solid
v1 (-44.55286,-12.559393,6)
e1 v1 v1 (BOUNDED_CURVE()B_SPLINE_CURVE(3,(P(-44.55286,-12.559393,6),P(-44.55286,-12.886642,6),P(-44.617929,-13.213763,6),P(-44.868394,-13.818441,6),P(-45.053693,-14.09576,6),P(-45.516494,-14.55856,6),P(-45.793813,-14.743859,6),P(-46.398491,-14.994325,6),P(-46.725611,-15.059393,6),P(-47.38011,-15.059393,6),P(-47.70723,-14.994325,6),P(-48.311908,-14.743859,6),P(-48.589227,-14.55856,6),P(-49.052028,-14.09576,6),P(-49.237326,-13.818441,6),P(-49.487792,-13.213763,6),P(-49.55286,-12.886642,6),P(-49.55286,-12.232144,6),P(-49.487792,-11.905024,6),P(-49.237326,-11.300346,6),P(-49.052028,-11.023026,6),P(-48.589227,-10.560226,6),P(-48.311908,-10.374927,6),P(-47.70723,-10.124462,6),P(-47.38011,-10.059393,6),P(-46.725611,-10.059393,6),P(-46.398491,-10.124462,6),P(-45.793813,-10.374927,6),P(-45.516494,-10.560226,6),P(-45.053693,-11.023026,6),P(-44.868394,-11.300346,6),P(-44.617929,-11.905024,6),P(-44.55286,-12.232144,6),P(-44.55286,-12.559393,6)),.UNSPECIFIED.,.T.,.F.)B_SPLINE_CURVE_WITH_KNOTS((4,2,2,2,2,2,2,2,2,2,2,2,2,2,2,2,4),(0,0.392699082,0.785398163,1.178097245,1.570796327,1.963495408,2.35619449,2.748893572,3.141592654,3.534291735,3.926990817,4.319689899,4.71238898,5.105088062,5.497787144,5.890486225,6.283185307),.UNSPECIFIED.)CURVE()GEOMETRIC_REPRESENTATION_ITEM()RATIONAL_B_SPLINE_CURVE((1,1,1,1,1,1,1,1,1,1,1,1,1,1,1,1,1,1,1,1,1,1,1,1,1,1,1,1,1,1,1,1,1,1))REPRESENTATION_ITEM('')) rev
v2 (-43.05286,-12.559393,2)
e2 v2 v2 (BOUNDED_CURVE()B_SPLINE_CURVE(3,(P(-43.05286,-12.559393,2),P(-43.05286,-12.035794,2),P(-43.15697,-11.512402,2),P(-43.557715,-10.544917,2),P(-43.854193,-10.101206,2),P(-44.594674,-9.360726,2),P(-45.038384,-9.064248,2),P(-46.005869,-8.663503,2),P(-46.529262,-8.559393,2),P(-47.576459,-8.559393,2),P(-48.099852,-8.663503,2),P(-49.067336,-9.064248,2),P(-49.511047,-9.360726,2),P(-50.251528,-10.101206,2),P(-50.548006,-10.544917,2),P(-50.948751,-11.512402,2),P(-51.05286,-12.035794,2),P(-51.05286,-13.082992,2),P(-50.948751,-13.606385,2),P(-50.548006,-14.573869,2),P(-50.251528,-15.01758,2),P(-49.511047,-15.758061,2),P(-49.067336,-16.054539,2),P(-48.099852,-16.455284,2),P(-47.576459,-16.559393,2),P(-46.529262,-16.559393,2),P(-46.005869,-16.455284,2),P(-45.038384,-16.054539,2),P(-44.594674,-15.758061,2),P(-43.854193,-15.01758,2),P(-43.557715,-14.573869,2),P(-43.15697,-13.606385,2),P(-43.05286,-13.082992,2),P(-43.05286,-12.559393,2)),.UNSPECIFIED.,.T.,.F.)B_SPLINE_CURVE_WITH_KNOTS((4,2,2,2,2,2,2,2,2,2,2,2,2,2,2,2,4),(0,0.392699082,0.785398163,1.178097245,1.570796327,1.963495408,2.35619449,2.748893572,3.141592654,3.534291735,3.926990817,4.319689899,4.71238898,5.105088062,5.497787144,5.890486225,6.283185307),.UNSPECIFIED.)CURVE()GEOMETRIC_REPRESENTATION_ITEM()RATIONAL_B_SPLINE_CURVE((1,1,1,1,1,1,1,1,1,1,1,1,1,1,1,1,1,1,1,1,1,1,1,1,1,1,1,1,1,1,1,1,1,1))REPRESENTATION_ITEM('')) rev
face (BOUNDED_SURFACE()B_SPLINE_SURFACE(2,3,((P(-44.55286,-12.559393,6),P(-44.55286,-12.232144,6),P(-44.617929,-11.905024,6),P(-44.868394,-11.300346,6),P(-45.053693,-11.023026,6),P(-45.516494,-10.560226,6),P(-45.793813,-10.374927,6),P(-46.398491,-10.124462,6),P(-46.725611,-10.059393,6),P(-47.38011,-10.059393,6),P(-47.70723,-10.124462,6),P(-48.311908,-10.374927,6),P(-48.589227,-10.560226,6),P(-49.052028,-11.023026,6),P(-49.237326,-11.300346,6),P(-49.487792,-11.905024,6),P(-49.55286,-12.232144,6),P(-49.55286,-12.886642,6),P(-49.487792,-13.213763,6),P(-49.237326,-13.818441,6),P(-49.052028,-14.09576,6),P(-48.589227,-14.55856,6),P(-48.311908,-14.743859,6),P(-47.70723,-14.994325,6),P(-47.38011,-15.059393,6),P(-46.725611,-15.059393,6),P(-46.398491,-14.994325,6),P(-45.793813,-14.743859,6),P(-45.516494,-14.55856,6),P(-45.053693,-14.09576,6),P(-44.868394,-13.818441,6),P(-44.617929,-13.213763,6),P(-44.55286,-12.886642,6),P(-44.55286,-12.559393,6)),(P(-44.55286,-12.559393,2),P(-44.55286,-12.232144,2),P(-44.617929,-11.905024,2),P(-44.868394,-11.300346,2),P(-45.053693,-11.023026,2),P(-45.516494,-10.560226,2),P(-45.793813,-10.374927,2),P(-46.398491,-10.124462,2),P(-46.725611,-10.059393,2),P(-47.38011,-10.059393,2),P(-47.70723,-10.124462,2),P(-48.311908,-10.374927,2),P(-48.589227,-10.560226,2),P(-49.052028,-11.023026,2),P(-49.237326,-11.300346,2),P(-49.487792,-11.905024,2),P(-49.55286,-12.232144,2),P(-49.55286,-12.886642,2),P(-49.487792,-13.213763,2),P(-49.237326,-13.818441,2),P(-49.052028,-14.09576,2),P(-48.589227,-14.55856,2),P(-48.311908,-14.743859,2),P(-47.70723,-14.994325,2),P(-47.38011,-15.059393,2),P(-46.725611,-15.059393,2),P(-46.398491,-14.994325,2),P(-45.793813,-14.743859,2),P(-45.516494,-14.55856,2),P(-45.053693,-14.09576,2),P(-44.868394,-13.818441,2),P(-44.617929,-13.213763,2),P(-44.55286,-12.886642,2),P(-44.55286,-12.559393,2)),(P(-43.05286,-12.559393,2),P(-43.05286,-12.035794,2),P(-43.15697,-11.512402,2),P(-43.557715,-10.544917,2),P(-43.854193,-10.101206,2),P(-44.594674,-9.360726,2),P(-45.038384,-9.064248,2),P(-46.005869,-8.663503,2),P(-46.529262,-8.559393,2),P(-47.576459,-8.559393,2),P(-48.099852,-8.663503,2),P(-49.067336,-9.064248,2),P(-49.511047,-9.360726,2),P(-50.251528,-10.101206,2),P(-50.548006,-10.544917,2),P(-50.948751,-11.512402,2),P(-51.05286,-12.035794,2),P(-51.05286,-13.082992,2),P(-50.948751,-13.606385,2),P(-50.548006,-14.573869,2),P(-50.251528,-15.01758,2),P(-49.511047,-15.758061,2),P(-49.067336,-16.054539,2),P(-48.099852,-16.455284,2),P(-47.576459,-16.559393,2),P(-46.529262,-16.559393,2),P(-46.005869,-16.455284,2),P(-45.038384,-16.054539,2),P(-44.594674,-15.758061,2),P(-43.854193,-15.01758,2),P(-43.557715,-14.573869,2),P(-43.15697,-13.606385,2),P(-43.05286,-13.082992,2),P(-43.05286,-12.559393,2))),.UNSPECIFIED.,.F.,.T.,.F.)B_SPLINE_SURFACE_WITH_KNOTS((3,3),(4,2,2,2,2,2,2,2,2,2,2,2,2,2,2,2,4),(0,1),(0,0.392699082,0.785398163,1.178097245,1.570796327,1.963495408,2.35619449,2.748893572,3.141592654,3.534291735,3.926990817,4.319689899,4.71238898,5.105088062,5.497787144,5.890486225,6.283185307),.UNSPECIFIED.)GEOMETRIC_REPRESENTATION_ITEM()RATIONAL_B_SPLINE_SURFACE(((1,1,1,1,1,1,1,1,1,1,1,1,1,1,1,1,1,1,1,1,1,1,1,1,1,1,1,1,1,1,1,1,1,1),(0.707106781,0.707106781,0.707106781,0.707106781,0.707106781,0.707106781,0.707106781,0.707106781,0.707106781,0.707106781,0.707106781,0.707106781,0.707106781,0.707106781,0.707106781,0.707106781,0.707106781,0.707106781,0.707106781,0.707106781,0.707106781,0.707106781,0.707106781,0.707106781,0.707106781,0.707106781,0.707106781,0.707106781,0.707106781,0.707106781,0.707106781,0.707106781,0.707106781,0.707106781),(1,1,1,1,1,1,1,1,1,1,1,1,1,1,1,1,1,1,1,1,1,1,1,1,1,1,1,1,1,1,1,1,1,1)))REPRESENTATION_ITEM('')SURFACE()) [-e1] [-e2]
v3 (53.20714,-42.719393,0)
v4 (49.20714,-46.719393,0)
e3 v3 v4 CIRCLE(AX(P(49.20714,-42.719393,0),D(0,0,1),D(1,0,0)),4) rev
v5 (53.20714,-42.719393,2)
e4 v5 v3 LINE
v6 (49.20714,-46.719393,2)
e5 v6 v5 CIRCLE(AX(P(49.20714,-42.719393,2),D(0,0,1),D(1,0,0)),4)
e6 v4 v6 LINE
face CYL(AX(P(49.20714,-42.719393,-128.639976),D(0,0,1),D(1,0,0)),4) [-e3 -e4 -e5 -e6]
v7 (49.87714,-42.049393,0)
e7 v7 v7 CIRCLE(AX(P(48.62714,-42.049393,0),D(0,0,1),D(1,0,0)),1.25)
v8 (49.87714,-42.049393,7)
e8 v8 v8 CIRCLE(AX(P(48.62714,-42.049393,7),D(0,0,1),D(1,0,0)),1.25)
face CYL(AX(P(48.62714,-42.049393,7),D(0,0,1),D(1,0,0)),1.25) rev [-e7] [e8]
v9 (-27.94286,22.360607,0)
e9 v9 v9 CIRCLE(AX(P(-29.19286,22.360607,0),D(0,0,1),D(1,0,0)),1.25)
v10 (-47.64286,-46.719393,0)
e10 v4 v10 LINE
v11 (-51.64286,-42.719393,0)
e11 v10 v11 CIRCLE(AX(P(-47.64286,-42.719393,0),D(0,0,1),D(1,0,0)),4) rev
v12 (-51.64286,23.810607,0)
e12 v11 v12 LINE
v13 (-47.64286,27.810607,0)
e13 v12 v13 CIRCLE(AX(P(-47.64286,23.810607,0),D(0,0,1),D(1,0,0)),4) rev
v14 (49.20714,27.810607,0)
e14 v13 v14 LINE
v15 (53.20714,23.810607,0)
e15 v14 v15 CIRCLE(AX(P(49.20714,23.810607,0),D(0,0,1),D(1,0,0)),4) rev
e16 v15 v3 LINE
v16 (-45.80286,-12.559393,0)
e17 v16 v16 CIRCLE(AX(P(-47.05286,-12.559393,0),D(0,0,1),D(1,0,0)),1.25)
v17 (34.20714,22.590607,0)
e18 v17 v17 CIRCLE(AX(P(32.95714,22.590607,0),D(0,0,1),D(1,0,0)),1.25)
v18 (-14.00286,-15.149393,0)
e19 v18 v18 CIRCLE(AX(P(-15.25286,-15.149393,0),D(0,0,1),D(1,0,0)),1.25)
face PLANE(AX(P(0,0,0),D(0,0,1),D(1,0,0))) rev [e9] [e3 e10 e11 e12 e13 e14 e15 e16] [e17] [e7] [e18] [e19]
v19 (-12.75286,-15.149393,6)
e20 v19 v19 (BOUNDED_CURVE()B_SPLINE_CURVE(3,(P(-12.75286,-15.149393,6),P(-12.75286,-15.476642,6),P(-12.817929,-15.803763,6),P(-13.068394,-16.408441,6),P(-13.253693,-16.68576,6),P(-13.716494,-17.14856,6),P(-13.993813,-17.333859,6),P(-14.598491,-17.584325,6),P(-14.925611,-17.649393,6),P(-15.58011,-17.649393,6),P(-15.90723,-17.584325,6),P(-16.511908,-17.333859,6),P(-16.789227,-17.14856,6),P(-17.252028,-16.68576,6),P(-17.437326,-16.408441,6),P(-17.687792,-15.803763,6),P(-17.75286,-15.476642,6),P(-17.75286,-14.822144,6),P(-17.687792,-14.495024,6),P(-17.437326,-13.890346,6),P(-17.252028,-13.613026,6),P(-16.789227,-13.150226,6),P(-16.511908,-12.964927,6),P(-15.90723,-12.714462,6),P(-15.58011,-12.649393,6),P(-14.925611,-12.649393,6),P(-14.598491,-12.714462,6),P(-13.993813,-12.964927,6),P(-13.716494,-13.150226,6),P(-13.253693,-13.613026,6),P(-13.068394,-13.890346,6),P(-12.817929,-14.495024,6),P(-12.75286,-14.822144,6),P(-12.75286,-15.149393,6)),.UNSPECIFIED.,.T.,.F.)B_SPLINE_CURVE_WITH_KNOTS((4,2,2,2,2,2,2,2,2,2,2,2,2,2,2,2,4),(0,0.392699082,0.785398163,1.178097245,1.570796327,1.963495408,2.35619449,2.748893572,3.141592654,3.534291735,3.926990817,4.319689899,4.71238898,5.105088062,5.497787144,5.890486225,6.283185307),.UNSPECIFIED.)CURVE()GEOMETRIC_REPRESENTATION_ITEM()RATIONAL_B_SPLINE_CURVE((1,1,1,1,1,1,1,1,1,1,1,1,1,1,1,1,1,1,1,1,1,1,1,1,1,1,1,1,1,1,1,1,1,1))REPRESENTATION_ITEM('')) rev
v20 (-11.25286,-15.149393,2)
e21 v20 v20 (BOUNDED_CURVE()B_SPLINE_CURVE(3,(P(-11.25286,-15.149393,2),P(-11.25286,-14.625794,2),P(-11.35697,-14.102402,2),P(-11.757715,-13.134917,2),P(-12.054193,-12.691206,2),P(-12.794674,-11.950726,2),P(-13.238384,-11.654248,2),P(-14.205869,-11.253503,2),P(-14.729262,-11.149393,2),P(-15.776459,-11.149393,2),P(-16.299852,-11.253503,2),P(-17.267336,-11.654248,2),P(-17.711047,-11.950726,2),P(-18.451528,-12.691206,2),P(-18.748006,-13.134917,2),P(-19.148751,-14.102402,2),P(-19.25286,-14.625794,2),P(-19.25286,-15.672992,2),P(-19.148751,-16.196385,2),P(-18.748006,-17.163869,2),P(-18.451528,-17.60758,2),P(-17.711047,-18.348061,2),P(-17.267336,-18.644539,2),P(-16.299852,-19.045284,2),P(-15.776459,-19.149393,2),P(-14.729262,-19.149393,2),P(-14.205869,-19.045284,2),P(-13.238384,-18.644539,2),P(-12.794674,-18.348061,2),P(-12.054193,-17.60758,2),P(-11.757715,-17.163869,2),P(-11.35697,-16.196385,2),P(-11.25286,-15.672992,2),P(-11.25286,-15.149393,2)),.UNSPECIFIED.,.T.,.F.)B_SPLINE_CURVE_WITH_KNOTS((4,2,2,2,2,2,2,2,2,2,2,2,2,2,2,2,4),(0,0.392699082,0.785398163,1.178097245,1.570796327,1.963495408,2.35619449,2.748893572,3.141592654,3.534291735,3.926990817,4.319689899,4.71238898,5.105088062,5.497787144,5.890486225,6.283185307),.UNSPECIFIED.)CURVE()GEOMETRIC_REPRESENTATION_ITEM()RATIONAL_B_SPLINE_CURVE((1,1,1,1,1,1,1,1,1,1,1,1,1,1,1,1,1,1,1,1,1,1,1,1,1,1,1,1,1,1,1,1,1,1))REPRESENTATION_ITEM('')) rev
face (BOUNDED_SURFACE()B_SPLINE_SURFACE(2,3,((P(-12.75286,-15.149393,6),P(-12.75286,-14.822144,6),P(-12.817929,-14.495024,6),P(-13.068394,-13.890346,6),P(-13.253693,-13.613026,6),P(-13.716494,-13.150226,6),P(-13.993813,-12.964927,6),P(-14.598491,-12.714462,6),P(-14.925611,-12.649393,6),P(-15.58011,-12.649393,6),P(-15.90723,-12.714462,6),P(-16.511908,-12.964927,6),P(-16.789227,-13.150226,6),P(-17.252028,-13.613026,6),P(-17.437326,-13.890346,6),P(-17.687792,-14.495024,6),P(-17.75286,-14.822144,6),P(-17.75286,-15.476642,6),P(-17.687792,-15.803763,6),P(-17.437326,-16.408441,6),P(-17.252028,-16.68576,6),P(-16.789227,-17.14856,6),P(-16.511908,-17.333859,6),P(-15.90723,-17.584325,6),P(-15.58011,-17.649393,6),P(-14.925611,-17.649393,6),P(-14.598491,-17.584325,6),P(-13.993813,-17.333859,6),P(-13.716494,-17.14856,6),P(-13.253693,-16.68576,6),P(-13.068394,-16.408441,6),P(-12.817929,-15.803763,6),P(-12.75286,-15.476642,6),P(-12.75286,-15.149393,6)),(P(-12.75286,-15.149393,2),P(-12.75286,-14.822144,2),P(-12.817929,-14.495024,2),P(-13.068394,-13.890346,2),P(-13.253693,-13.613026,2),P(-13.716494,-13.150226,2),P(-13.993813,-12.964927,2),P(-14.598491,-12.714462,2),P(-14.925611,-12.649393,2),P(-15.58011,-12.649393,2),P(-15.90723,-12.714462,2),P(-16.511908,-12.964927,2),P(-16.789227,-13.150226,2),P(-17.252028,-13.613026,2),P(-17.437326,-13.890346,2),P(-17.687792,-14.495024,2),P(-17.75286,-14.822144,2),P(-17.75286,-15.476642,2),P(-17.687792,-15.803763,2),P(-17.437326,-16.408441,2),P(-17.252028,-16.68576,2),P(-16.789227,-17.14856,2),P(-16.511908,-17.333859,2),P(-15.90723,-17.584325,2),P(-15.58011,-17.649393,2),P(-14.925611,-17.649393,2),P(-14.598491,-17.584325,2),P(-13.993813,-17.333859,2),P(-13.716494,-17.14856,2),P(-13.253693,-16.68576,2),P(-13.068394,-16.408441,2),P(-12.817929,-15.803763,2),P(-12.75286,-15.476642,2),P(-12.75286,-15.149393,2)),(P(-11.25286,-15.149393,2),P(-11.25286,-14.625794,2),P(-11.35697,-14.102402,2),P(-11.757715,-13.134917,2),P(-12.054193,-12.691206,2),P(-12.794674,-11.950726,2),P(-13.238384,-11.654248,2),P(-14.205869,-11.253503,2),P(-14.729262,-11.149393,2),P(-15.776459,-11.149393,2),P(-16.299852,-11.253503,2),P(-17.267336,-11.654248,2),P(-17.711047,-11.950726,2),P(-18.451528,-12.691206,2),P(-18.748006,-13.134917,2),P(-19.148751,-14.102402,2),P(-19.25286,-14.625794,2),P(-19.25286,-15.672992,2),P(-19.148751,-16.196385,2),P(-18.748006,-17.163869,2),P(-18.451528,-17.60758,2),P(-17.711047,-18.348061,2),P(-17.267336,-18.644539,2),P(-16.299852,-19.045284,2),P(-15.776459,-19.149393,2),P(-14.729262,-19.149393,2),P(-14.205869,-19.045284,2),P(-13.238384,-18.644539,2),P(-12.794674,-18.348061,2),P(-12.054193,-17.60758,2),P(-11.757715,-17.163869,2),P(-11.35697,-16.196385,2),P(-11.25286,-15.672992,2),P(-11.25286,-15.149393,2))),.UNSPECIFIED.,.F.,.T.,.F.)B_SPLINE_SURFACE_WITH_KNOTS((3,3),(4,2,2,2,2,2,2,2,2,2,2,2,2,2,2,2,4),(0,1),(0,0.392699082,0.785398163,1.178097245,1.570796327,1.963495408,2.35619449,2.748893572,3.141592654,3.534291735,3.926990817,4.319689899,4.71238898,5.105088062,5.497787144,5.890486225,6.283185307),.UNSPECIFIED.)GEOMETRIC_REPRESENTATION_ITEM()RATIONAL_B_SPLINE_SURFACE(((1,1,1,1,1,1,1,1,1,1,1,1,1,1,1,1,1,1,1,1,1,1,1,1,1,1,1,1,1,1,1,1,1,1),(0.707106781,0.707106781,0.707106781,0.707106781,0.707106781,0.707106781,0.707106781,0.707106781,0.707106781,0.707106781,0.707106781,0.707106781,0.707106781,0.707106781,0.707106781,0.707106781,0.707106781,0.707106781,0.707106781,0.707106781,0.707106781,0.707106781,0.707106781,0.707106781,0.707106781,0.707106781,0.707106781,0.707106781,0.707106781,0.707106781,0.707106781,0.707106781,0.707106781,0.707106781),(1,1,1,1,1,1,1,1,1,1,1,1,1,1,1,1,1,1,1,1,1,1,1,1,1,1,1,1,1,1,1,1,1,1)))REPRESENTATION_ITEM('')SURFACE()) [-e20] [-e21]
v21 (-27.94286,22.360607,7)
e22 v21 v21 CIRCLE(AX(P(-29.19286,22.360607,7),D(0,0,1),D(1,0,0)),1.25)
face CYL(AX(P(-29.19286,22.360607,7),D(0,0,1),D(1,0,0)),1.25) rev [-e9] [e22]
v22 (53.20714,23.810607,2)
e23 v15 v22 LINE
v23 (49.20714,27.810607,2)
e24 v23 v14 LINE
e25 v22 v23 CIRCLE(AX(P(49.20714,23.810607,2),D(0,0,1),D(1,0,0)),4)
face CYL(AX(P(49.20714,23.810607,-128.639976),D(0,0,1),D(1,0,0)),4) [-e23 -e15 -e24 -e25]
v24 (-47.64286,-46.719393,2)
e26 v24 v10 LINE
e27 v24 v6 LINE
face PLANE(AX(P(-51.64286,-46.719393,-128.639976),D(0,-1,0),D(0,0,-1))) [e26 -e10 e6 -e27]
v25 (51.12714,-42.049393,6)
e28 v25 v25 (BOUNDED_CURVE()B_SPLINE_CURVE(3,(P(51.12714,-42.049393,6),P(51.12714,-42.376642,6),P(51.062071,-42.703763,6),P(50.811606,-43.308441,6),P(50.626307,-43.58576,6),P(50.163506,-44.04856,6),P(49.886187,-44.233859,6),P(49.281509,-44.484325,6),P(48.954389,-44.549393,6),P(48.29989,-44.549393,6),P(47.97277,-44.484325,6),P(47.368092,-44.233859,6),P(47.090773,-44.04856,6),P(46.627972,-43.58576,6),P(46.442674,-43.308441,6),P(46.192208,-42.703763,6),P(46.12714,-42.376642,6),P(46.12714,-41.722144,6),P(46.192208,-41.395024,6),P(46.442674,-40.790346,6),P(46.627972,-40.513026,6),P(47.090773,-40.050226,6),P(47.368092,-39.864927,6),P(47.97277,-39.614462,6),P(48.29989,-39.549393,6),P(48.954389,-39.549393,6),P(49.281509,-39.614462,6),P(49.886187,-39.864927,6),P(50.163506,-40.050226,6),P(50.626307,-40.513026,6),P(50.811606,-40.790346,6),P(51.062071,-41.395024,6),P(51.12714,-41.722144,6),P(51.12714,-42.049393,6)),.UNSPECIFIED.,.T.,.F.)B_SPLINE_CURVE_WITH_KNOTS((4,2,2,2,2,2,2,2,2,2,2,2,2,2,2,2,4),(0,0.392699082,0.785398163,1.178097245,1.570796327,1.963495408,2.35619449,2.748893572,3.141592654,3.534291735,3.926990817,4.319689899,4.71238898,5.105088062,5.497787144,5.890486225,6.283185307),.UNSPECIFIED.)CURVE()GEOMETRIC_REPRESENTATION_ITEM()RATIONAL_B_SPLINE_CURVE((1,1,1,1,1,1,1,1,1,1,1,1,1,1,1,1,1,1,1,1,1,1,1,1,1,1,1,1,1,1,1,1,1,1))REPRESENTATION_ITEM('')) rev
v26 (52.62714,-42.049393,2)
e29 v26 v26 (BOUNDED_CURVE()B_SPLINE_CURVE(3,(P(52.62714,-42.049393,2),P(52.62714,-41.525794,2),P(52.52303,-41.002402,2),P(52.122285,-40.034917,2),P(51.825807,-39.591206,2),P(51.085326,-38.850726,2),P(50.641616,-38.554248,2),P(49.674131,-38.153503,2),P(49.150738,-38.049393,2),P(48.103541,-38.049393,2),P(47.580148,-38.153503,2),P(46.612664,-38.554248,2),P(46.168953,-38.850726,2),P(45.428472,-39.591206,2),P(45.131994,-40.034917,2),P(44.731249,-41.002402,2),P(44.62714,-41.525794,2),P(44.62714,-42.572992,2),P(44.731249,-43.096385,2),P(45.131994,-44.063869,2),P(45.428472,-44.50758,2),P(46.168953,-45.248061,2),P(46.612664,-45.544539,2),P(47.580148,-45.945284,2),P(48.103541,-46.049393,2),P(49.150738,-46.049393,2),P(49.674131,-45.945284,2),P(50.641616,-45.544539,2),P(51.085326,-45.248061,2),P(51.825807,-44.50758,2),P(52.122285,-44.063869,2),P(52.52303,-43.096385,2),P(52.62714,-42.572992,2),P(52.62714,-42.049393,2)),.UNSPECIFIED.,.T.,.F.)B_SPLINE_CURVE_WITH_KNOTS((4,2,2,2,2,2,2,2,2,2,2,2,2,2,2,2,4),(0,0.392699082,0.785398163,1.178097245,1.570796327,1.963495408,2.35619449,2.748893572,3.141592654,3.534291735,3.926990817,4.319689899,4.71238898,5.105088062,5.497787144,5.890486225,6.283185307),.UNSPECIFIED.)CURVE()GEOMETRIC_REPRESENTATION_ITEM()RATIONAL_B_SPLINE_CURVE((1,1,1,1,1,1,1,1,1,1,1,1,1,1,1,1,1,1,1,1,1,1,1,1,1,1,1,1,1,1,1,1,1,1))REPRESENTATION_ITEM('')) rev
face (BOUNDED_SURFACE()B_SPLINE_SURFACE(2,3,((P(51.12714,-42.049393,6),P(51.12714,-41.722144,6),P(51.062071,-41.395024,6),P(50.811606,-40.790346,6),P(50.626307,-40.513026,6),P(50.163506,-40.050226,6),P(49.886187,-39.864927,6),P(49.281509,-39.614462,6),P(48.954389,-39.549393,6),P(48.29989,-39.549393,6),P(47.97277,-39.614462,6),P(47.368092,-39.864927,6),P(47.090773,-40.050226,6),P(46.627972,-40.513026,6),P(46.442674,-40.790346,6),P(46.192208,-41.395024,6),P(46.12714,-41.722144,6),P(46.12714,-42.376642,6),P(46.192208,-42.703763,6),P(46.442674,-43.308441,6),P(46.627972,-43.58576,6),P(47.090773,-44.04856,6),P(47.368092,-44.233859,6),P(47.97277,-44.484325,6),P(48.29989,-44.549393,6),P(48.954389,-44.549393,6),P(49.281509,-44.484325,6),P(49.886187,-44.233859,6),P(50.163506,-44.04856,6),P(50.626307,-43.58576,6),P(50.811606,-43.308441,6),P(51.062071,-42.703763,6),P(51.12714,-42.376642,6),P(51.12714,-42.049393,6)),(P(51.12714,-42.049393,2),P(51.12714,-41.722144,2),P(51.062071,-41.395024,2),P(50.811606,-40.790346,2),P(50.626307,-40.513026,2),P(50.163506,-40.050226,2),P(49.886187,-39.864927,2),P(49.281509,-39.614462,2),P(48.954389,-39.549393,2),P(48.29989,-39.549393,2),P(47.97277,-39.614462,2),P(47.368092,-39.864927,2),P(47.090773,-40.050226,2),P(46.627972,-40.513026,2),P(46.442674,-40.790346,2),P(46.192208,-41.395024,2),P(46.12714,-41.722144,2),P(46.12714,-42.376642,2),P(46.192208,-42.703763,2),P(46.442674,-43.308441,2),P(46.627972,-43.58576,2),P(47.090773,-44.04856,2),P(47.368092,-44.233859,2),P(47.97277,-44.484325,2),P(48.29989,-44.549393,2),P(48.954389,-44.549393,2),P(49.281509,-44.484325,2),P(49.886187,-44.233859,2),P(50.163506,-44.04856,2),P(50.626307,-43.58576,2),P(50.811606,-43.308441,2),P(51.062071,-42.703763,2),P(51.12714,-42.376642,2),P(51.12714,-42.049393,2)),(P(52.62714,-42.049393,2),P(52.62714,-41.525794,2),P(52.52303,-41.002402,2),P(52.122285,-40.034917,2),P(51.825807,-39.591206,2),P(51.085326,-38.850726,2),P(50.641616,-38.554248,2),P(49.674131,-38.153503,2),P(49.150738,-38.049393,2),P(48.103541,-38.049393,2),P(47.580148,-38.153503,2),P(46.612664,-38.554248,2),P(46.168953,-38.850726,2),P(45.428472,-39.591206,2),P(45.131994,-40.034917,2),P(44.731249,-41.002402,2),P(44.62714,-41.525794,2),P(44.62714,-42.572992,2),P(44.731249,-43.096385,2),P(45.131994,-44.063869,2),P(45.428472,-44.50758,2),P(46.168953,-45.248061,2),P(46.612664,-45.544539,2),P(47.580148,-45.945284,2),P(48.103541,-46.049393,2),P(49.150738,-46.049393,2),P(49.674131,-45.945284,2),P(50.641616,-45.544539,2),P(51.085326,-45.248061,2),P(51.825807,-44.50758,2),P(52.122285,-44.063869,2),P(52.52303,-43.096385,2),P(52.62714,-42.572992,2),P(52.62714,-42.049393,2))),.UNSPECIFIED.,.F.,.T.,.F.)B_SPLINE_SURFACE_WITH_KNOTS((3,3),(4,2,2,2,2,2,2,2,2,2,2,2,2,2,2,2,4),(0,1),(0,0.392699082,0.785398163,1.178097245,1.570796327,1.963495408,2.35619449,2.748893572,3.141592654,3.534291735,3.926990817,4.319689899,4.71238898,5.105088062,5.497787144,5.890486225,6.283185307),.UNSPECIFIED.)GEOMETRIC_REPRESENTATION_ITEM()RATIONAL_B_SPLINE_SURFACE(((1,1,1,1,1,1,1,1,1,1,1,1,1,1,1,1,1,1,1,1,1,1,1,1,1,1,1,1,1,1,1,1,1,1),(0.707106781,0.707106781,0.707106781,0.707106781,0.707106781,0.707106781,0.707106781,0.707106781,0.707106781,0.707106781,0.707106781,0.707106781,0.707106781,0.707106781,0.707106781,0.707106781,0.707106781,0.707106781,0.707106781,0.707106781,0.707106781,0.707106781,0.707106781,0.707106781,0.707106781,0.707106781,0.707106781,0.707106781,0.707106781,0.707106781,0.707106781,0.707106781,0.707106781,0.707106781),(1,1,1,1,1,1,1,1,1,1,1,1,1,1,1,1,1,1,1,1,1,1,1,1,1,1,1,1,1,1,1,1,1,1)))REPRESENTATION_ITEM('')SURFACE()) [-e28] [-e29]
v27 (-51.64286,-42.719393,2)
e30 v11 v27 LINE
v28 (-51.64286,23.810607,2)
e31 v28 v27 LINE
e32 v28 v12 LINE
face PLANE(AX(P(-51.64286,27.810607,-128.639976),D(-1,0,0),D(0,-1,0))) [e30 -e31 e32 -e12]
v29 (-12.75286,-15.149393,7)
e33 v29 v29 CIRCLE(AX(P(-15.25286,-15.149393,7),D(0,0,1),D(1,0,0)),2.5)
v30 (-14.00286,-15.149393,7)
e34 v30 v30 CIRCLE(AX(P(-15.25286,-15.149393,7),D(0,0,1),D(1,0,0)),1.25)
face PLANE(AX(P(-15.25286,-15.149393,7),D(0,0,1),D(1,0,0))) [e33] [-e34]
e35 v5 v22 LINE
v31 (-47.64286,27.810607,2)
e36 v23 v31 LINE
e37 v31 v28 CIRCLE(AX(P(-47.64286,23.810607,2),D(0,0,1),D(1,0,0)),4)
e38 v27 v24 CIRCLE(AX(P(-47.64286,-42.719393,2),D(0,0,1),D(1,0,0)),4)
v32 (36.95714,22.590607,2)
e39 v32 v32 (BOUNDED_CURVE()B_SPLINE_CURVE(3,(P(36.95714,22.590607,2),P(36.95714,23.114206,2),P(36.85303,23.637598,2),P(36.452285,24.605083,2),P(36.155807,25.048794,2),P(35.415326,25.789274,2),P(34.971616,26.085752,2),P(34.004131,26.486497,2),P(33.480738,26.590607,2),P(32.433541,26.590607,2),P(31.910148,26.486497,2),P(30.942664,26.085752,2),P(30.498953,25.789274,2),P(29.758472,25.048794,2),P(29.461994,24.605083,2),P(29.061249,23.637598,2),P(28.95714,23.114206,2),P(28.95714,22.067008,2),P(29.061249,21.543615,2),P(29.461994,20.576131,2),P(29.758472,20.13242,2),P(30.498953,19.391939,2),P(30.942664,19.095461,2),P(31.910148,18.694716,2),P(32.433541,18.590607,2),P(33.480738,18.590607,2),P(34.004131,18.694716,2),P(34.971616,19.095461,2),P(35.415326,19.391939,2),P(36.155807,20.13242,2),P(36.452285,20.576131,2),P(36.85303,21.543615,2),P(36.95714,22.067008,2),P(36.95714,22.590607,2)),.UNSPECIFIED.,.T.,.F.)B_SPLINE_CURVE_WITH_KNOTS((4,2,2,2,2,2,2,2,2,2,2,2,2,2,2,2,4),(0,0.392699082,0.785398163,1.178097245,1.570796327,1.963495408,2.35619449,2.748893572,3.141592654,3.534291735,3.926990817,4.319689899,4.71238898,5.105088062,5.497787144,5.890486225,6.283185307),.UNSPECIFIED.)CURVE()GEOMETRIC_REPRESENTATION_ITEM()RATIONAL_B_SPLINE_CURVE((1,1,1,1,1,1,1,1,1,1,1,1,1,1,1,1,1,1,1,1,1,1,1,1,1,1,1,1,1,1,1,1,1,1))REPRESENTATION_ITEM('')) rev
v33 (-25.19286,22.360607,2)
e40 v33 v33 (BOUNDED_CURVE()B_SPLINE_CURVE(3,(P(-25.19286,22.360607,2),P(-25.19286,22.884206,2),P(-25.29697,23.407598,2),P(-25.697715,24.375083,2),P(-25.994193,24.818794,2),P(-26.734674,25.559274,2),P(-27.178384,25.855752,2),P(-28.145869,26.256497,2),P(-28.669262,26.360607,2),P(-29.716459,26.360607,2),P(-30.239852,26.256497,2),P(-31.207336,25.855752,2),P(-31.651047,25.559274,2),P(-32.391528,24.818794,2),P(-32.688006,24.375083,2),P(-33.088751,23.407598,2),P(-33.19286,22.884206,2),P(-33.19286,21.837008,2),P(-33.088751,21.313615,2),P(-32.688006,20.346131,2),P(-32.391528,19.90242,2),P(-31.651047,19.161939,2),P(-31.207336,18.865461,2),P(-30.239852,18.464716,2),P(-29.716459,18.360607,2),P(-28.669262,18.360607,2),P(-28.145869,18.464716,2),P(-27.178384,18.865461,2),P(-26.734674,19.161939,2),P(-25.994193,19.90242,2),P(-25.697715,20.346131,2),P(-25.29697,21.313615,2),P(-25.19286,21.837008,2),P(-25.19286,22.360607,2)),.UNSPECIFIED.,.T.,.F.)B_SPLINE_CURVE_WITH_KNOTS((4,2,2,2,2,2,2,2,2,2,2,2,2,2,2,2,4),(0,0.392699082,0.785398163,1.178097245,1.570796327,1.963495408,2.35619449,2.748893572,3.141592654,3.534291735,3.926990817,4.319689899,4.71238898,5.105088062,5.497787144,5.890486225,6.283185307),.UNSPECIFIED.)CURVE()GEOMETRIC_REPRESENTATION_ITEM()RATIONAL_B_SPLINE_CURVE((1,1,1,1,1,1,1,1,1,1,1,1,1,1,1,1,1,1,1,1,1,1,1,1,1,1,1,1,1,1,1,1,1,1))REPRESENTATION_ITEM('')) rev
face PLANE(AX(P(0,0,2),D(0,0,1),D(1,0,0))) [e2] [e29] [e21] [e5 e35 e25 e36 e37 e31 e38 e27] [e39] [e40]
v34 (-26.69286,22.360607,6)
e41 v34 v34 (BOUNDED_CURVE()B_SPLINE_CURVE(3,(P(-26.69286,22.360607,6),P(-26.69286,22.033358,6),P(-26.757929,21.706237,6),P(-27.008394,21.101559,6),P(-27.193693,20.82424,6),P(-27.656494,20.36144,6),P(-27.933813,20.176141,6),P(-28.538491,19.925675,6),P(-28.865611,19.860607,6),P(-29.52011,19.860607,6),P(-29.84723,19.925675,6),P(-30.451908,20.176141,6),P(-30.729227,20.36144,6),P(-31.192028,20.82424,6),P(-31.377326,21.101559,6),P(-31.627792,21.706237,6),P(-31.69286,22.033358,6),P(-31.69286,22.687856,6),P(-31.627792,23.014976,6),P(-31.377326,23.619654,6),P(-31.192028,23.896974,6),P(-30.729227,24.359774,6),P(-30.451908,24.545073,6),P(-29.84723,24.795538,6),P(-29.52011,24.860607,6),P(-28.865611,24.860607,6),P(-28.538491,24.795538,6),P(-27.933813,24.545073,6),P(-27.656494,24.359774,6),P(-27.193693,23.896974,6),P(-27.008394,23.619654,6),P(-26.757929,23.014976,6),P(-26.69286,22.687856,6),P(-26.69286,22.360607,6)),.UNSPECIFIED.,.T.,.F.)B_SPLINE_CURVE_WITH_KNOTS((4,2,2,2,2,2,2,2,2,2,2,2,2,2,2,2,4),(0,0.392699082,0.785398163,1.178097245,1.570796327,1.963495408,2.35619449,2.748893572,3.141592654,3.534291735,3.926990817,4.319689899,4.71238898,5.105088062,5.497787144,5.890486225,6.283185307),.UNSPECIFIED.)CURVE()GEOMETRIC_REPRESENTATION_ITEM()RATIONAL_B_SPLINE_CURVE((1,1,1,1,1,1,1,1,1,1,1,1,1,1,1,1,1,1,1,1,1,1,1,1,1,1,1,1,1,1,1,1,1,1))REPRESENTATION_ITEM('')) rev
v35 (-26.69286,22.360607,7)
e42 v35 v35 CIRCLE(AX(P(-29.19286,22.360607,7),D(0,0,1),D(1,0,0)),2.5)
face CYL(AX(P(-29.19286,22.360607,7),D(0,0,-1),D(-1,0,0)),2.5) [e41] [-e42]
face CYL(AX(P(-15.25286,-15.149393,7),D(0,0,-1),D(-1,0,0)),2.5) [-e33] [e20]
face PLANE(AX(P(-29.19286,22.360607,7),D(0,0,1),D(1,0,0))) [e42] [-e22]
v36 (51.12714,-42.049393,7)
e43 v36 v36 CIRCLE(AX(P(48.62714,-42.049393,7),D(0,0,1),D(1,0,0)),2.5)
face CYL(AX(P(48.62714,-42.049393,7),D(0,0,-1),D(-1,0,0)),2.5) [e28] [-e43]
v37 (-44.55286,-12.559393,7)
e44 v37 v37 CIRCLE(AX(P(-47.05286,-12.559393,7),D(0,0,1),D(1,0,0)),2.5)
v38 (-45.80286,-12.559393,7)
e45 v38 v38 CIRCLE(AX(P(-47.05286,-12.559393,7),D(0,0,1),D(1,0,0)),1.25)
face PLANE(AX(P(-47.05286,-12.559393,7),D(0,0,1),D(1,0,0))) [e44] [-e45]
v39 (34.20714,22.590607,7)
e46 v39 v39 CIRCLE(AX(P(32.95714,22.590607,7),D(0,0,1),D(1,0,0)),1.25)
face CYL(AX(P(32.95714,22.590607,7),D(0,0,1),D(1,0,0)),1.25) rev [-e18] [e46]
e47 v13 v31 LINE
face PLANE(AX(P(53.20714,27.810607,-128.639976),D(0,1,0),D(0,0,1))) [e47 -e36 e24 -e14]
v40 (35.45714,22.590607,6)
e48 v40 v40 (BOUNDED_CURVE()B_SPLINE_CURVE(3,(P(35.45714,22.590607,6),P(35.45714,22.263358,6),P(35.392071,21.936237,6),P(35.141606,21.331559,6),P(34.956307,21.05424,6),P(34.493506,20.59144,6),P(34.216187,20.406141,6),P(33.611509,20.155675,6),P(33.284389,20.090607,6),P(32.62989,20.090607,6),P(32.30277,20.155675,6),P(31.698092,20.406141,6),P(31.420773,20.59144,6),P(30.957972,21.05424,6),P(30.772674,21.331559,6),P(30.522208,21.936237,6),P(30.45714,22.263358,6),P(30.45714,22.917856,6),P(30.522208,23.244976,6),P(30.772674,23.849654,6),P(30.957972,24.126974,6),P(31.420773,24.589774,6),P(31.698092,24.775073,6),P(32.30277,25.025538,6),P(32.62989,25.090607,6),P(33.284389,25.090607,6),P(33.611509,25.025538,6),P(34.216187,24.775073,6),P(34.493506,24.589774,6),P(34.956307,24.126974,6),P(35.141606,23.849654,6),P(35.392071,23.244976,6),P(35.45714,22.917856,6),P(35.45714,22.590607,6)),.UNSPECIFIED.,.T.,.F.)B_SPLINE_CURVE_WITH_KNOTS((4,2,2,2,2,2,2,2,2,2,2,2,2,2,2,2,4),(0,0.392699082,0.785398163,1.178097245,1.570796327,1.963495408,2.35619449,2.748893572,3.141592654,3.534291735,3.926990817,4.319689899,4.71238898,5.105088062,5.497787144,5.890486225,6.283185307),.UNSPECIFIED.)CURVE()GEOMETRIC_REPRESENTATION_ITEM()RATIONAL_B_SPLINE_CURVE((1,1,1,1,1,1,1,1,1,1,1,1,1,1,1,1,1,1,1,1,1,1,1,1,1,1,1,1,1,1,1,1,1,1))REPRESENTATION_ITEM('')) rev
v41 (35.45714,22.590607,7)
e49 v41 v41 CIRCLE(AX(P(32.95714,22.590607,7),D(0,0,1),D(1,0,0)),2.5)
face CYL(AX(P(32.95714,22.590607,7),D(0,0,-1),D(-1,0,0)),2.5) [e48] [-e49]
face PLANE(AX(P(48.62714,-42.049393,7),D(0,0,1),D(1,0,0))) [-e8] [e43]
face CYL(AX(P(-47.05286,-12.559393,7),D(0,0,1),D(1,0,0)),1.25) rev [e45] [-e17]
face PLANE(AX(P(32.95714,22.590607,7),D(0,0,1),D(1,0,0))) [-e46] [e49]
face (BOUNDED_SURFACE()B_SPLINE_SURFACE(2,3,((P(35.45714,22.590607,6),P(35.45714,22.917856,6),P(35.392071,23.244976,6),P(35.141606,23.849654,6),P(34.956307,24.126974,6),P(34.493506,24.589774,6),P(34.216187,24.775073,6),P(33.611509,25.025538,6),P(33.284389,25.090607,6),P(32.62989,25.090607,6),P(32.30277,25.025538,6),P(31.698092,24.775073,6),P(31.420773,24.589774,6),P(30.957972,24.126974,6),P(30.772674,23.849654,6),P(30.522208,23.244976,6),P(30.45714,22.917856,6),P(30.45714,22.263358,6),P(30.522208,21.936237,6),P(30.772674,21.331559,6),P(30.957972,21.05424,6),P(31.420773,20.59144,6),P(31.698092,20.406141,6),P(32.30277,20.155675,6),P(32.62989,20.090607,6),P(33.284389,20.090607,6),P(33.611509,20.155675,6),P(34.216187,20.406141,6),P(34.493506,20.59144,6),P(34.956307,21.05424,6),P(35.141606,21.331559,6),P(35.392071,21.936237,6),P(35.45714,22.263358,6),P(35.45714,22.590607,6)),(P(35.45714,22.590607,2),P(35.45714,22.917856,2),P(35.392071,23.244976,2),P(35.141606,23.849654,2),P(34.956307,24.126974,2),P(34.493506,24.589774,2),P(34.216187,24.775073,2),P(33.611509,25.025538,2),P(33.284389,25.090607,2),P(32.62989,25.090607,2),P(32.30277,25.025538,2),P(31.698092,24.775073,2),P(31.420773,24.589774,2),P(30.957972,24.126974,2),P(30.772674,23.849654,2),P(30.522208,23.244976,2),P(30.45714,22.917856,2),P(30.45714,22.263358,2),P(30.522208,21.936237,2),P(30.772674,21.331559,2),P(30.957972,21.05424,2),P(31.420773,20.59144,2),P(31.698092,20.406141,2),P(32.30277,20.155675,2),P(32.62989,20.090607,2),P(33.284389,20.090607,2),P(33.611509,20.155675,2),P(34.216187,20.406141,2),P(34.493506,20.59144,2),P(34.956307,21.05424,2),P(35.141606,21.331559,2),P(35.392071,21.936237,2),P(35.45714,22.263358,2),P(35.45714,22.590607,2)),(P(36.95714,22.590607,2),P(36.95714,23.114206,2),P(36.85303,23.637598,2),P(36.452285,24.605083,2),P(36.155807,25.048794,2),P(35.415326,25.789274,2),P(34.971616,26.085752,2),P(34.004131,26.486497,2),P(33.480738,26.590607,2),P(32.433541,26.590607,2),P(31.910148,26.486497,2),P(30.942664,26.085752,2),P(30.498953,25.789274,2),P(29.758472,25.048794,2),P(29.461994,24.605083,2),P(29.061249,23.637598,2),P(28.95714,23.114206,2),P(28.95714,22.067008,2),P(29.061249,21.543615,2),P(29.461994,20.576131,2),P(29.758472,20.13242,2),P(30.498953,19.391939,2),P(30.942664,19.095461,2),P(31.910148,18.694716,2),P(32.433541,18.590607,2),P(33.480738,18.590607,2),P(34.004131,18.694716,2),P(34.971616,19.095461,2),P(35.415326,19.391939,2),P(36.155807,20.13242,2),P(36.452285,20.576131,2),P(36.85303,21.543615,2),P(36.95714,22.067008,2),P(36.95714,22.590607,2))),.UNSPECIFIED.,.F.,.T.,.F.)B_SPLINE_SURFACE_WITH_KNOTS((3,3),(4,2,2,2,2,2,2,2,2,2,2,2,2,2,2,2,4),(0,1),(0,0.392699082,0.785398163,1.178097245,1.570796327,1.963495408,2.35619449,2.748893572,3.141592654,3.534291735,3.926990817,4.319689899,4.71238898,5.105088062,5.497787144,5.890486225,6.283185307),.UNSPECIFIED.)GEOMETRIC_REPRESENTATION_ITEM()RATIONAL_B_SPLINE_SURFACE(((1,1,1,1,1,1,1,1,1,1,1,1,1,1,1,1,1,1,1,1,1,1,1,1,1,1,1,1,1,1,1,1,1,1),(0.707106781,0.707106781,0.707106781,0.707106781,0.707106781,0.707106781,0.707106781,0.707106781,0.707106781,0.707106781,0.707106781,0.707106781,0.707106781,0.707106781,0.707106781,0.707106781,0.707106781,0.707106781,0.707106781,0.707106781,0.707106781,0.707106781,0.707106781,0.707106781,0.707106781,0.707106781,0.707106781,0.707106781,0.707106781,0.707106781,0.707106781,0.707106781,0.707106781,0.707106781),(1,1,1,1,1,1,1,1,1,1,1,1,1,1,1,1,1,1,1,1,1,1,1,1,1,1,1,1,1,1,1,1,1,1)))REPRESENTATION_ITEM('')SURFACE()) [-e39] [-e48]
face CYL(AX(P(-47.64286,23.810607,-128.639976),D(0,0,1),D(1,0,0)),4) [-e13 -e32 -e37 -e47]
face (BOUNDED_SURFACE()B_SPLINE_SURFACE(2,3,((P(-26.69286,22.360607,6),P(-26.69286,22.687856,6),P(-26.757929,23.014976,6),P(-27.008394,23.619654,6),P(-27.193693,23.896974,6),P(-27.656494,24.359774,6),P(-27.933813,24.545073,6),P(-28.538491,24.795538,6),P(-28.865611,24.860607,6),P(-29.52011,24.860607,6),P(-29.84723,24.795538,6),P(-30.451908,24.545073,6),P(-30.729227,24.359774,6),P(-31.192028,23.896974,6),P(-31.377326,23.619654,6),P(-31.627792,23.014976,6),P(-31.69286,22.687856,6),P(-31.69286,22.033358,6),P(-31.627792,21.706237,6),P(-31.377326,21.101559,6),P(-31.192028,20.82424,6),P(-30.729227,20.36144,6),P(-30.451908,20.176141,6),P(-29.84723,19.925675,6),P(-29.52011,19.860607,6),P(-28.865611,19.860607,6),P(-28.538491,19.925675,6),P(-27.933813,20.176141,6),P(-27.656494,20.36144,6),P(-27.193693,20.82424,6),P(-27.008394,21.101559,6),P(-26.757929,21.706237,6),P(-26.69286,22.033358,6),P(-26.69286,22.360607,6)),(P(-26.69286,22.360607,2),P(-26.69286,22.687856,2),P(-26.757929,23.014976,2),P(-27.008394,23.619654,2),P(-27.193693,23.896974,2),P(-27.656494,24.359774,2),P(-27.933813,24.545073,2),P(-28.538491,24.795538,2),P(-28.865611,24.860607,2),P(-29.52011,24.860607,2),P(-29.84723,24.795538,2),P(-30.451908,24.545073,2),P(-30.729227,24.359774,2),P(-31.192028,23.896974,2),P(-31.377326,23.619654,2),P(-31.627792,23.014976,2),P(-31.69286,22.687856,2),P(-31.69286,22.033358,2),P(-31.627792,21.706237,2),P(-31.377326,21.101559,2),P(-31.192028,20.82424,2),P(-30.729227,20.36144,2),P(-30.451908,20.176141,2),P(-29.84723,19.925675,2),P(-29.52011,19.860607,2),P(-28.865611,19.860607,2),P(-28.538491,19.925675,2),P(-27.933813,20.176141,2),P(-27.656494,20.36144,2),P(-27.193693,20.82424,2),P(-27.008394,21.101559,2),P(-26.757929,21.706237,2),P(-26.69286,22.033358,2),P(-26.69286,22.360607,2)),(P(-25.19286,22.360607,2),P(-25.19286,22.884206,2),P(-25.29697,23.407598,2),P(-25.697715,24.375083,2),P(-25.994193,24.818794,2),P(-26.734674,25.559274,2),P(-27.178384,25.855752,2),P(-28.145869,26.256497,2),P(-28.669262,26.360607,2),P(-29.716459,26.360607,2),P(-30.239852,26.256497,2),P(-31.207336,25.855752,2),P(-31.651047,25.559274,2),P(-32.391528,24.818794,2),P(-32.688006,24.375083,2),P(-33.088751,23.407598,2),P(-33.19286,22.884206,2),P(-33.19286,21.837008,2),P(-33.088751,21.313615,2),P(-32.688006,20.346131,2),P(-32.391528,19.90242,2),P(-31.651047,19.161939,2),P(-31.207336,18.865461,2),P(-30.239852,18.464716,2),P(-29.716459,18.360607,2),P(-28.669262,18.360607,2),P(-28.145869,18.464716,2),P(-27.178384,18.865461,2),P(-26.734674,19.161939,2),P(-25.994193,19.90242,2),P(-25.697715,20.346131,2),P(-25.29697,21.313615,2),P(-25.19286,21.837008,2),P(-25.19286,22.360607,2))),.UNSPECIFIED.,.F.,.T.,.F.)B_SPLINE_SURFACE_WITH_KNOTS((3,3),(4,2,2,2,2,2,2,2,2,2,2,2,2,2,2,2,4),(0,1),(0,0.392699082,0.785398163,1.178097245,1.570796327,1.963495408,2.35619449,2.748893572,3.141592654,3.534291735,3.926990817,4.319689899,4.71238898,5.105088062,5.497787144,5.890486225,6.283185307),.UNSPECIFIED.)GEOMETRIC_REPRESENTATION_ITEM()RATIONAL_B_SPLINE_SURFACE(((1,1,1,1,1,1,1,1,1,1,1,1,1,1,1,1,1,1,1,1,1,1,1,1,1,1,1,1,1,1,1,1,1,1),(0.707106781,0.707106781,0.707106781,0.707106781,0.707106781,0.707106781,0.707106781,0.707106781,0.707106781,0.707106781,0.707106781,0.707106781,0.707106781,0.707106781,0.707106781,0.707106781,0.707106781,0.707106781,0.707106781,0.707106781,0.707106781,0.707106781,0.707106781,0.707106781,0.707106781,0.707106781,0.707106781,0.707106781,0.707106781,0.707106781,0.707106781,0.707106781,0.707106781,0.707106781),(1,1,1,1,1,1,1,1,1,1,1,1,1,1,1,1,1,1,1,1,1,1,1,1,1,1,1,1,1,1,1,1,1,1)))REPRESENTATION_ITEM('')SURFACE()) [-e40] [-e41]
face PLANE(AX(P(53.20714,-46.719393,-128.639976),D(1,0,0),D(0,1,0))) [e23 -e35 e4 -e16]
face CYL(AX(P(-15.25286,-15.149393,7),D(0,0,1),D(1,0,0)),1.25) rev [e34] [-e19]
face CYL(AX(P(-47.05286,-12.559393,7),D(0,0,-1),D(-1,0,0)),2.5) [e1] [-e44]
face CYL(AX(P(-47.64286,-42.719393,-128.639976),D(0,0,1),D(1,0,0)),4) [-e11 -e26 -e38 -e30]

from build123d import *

# Parameters (mm, degrees)
SKETCH1_W           = 100.85
SKETCH1_H           = 70.53
BOSS_EXTRUDE1_DEPTH = 2
SKETCH6_W           = 104.85
SKETCH6_H           = 74.53
BOSS_EXTRUDE3_DEPTH = 2
SKETCH3_R           = 2.5
BOSS_EXTRUDE2_DEPTH = 5
FILLET1_SIZE        = 1.5
FILLET1_SIZE_2      = 4
FILLET2_R           = 4


with BuildPart() as part:
    # Sketch1 → Boss-Extrude1 (new body)
    with BuildSketch(Plane.XY):
        with Locations((0.782139599, -9.454393248)):
            Rectangle(SKETCH1_W, SKETCH1_H)
    extrude(amount=BOSS_EXTRUDE1_DEPTH)

    # Sketch6 → Boss-Extrude3 (add)
    with BuildSketch(Plane.XY.offset(2)):
        with Locations((0.782139599, -9.454393248)):
            Rectangle(SKETCH6_W, SKETCH6_H)
    extrude(amount=-BOSS_EXTRUDE3_DEPTH)

    # Sketch3 → Boss-Extrude2 (add)
    with BuildSketch(Plane.XY.offset(2)):
        with Locations((-29.192860401, 22.360606752)):
            Circle(SKETCH3_R)
    boss_extrude2 = extrude(amount=BOSS_EXTRUDE2_DEPTH)

    # Sketch5 → Tap Drill for M3x0.5 Tap1 (revolve, cut)
    with BuildSketch(Plane(origin=(-29.192860401, 22.360606752, 7), x_dir=(0, -1, 0), z_dir=(1, 0, 0))):
        Polygon((0, 0), (0, 10.751075774), (1.25, 10), (1.25, 0), align=None)
    tap_drill_for_m3x0_5_tap1 = revolve(axis=Axis((-29.192860401, 22.360606752, 13.35), (0, 0, -1)), mode=Mode.SUBTRACT)

    # Sketch-Pattern1: Boss-Extrude2, Tap Drill for M3x0.5 Tap1 at 4 more places
    with Locations((-17.86, -34.92, 0), (13.94, -37.51, 0), (77.82, -64.41, 0), (62.15, 0.23, 0)):
        add(boss_extrude2)
        add(tap_drill_for_m3x0_5_tap1, mode=Mode.SUBTRACT)

    # Fillet1
    # an asymmetric fillet: 4, 1.5 mm, written as the material it adds along each edge
    with BuildSketch(Plane(origin=(-29.192860401, 22.360606752, 2), x_dir=(1, 0, 0), z_dir=(0, -1, 0))) as fillet1_piece_1:
        with BuildLine():
            Bezier((2.5 + FILLET1_SIZE, 0), (2.5, 0), (2.5, FILLET1_SIZE_2), weights=[1, 0.707106781, 1])
            Line((2.5, FILLET1_SIZE_2), (2.5, 0))
            Line((2.5, 0), (2.5 + FILLET1_SIZE, 0))
        make_face()
    revolve(axis=Axis((-29.192860401, 22.360606752, 2), (0, 0, 1)))
    with BuildSketch(Plane(origin=(-47.052860401, -12.559393248, 2), x_dir=(1, 0, 0), z_dir=(0, -1, 0))) as fillet1_piece_2:
        with BuildLine():
            Bezier((2.5 + FILLET1_SIZE, 0), (2.5, 0), (2.5, FILLET1_SIZE_2), weights=[1, 0.707106781, 1])
            Line((2.5, FILLET1_SIZE_2), (2.5, 0))
            Line((2.5, 0), (2.5 + FILLET1_SIZE, 0))
        make_face()
    revolve(axis=Axis((-47.052860401, -12.559393248, 2), (0, 0, 1)))
    with BuildSketch(Plane(origin=(-15.252860401, -15.149393248, 2), x_dir=(1, 0, 0), z_dir=(0, -1, 0))) as fillet1_piece_3:
        with BuildLine():
            Bezier((2.5 + FILLET1_SIZE, 0), (2.5, 0), (2.5, FILLET1_SIZE_2), weights=[1, 0.707106781, 1])
            Line((2.5, FILLET1_SIZE_2), (2.5, 0))
            Line((2.5, 0), (2.5 + FILLET1_SIZE, 0))
        make_face()
    revolve(axis=Axis((-15.252860401, -15.149393248, 2), (0, 0, 1)))
    with BuildSketch(Plane(origin=(48.627139599, -42.049393248, 2), x_dir=(1, 0, 0), z_dir=(0, -1, 0))) as fillet1_piece_4:
        with BuildLine():
            Bezier((2.5 + FILLET1_SIZE, 0), (2.5, 0), (2.5, FILLET1_SIZE_2), weights=[1, 0.707106781, 1])
            Line((2.5, FILLET1_SIZE_2), (2.5, 0))
            Line((2.5, 0), (2.5 + FILLET1_SIZE, 0))
        make_face()
    revolve(axis=Axis((48.627139599, -42.049393248, 2), (0, 0, 1)))
    with BuildSketch(Plane(origin=(32.957139599, 22.590606752, 2), x_dir=(1, 0, 0), z_dir=(0, -1, 0))) as fillet1_piece_5:
        with BuildLine():
            Bezier((2.5 + FILLET1_SIZE, 0), (2.5, 0), (2.5, FILLET1_SIZE_2), weights=[1, 0.707106781, 1])
            Line((2.5, FILLET1_SIZE_2), (2.5, 0))
            Line((2.5, 0), (2.5 + FILLET1_SIZE, 0))
        make_face()
    revolve(axis=Axis((32.957139599, 22.590606752, 2), (0, 0, 1)))

    # Fillet2
    fillet2_edges = [part.edges().sort_by_distance(p)[0] for p in [
        (-51.642860401, 27.810606752, 1),
        (53.207139599, 27.810606752, 1),
        (53.207139599, -46.719393248, 1),
        (-51.642860401, -46.719393248, 1),
    ]]
    fillet(fillet2_edges, radius=FILLET2_R)


solid = part.part
